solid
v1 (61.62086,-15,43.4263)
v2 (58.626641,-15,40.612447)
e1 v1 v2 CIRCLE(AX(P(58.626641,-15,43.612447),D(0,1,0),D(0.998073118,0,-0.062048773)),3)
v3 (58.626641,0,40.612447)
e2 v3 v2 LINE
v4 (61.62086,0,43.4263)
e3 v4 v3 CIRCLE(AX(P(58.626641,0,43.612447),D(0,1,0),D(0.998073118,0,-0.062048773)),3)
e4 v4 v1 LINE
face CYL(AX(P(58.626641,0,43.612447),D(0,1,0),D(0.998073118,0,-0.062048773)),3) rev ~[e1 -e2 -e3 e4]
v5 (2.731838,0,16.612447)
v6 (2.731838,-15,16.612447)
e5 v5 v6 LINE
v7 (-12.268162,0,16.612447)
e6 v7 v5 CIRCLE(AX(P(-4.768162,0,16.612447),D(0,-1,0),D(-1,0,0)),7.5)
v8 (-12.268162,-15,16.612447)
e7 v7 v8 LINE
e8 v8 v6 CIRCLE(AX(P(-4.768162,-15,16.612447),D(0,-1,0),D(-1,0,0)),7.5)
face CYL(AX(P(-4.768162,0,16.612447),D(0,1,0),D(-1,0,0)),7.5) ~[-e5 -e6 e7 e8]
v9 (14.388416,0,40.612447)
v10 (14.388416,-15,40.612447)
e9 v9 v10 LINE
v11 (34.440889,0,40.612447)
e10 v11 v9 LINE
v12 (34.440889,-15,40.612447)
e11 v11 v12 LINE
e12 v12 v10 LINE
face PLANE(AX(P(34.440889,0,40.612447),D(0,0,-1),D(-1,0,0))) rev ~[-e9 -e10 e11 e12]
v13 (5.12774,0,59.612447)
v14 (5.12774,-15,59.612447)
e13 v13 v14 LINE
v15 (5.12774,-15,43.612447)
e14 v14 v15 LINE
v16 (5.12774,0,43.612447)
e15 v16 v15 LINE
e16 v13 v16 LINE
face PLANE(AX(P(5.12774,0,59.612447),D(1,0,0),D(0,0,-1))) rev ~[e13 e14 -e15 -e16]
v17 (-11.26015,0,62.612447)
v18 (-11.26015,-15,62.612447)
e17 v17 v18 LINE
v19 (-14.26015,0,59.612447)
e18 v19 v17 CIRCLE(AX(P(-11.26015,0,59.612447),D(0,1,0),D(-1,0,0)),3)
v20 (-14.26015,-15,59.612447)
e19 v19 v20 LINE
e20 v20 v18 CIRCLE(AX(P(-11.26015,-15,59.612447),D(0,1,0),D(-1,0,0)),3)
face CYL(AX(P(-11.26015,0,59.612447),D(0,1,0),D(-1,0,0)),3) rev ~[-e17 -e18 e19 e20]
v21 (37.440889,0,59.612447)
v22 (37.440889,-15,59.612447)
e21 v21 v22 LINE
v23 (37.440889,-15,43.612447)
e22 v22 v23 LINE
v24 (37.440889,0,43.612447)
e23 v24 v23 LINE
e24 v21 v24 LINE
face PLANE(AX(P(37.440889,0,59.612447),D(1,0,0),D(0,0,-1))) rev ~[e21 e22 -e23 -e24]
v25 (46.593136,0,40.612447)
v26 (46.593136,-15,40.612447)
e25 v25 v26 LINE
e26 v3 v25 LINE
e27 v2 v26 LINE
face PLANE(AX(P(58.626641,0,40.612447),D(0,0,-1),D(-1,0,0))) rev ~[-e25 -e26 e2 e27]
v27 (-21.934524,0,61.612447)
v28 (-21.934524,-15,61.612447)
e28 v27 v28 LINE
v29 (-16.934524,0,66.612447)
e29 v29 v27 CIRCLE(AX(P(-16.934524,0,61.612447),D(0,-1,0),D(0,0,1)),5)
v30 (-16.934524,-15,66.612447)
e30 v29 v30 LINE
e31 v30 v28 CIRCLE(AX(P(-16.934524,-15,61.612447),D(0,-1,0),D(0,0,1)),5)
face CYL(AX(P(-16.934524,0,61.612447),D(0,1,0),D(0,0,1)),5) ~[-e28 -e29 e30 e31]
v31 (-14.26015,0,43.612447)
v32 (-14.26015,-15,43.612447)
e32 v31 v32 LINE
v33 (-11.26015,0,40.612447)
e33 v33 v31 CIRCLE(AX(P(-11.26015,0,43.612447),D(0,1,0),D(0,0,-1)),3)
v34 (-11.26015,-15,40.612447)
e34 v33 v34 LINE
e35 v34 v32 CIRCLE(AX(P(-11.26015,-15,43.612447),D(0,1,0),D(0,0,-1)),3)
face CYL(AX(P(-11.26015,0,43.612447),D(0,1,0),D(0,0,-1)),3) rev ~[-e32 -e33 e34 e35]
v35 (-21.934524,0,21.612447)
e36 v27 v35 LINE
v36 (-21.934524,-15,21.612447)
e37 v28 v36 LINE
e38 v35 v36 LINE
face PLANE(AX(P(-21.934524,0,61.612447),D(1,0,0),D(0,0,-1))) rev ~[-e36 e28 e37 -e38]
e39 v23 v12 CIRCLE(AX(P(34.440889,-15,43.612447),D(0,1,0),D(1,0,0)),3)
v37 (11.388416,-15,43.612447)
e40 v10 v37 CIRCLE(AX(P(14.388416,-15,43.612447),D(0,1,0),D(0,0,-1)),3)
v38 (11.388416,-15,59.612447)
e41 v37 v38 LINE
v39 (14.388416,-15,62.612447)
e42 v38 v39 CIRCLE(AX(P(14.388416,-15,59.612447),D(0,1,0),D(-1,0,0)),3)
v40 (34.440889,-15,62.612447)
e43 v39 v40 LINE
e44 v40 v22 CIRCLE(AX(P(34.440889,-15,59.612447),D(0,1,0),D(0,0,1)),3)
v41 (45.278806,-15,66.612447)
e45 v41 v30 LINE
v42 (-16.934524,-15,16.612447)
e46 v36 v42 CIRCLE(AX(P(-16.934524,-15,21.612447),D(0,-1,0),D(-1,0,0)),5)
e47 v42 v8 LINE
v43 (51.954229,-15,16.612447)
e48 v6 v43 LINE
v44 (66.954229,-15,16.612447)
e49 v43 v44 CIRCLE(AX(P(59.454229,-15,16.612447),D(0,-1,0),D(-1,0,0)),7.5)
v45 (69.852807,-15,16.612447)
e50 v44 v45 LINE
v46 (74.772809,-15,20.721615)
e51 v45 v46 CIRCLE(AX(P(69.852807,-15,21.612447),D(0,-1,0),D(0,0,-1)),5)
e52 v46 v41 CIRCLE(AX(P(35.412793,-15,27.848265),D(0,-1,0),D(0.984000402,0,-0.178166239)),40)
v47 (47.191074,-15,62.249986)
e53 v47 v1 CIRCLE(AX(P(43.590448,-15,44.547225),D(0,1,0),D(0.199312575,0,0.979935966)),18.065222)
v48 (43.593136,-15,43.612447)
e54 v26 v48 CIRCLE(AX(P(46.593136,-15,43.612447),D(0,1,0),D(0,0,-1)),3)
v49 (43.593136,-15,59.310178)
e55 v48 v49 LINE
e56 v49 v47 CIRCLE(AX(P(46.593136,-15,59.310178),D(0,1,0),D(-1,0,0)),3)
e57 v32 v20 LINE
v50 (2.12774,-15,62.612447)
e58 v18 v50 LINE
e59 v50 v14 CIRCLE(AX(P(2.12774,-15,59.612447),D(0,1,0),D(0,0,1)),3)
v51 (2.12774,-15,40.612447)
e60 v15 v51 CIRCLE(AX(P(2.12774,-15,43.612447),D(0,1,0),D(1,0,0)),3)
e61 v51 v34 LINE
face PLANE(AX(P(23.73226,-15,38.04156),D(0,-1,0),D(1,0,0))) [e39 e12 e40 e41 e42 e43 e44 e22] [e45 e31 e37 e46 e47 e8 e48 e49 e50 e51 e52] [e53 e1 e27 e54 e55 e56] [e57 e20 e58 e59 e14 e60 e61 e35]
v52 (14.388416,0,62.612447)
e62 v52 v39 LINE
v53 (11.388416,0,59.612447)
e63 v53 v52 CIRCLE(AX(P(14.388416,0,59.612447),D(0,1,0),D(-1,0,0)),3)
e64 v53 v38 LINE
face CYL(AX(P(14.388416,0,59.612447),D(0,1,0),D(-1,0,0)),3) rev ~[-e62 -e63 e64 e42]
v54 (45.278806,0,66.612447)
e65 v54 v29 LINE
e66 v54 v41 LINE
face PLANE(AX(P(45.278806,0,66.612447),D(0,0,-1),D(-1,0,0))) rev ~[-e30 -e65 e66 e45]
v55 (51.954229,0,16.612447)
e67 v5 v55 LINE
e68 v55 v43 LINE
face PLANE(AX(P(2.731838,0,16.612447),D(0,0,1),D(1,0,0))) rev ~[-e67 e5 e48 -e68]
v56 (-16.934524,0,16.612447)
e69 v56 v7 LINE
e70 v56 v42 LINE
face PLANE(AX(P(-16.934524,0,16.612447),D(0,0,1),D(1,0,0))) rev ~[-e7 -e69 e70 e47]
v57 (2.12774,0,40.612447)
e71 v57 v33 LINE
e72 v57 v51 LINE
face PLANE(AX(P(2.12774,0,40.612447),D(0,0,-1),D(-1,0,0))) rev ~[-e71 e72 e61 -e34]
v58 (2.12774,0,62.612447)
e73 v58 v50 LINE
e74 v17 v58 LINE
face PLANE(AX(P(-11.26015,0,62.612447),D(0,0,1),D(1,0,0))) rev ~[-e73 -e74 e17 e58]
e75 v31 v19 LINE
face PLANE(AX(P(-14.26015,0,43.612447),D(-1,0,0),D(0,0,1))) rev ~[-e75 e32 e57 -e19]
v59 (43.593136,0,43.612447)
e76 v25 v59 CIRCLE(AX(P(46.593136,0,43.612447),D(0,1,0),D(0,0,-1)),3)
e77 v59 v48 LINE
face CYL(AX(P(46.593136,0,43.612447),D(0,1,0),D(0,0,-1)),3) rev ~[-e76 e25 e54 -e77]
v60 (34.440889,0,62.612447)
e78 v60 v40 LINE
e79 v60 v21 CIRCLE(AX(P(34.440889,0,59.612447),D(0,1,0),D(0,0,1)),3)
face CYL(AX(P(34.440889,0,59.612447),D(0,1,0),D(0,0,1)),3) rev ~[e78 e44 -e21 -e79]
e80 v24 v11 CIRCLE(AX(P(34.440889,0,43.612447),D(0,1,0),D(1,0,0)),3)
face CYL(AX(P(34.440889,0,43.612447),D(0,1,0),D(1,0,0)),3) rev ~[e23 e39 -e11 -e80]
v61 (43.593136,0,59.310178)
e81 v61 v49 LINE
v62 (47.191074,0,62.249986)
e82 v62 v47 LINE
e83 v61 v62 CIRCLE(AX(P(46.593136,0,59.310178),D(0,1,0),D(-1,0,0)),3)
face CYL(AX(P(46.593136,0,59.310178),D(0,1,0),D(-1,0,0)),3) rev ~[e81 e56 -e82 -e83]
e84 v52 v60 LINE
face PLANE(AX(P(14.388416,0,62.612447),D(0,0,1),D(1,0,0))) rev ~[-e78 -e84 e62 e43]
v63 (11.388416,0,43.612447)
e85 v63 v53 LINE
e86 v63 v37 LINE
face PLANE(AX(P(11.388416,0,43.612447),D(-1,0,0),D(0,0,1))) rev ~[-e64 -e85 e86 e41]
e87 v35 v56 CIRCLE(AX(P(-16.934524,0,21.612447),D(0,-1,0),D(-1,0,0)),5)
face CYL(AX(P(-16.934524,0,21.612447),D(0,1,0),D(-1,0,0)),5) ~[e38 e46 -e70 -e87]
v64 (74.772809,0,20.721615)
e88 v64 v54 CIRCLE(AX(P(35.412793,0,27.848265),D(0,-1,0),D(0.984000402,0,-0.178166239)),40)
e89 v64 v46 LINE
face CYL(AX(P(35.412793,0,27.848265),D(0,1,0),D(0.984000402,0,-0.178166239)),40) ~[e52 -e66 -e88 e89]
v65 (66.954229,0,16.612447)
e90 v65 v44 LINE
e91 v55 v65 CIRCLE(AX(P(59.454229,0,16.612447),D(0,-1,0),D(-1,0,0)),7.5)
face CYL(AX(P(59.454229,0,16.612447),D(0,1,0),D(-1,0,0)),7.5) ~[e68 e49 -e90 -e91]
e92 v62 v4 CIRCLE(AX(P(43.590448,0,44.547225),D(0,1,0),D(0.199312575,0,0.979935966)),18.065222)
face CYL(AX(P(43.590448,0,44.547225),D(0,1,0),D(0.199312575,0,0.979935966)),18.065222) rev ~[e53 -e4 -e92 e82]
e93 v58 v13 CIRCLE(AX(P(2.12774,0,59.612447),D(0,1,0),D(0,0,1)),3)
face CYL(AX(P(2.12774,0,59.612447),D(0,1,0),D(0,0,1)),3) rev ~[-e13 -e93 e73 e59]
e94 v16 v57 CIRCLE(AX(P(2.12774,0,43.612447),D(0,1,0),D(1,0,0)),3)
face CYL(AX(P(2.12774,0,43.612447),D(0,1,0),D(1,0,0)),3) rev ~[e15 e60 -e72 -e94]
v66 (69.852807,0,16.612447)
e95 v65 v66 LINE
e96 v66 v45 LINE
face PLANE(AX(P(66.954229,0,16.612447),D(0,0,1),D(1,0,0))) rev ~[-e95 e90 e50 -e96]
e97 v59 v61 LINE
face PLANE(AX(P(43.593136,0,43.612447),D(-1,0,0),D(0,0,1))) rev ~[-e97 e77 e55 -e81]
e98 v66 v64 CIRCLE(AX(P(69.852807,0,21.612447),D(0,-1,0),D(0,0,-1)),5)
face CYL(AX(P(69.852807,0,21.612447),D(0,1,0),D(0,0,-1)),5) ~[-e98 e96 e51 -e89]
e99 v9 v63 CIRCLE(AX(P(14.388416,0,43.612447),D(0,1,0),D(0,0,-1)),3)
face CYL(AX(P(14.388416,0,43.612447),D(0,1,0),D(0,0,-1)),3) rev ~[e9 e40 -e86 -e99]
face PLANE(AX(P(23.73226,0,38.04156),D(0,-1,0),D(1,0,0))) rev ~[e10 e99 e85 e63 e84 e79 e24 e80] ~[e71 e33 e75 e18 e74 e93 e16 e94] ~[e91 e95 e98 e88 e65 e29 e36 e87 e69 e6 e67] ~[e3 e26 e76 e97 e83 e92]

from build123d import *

# Parameters (mm, degrees)
F1_DEPTH = 15


# Not quite as in the source:
# - a feature names something its author has since deleted; it is built from what else it names


with BuildPart() as f1:
    # F0 (on Front) → F1 (new body)
    with BuildSketch(Plane.XZ):
        with BuildLine():
            Line((45.2788062093, 66.612446636), (-16.9345241785, 66.612446636))
            ThreePointArc((-16.9345241785, 66.612446636), (-20.4700580844, 65.1479805419), (-21.9345241785, 61.612446636))
            Line((-21.9345241785, 61.612446636), (-21.9345241785, 21.612446636))
            ThreePointArc((-21.9345241785, 21.612446636), (-20.4700580844, 18.07691273), (-16.9345241785, 16.612446636))
            Line((-16.9345241785, 16.612446636), (-12.2681620345, 16.612446636))
            ThreePointArc((-12.2681620345, 16.612446636), (-4.7681620345, 9.112446636), (2.7318379655, 16.612446636))
            Line((2.7318379655, 16.612446636), (51.954228729, 16.612446636))
            ThreePointArc((51.954228729, 16.612446636), (59.454228729, 9.112446636), (66.954228729, 16.612446636))
            Line((66.954228729, 16.612446636), (69.8528067806, 16.612446636))
            ThreePointArc((69.8528067806, 16.612446636), (73.0579467169, 17.774859114), (74.7728087909, 20.7216154405))
            ThreePointArc((74.7728087909, 20.7216154405), (69.0623483383, 49.4748090163), (45.2788062093, 66.612446636))
        make_face()
        with BuildLine():
            ThreePointArc((-14.2601495609, 59.612446636), (-13.3814699044, 61.7337669795), (-11.2601495609, 62.612446636))
            Line((-11.2601495609, 62.612446636), (2.1277400926, 62.612446636))
            ThreePointArc((2.1277400926, 62.612446636), (4.2490604361, 61.7337669795), (5.1277400926, 59.612446636))
            Line((5.1277400926, 59.612446636), (5.1277400926, 43.612446636))
            ThreePointArc((5.1277400926, 43.612446636), (4.2490604361, 41.4911262924), (2.1277400926, 40.612446636))
            Line((2.1277400926, 40.612446636), (-11.2601495609, 40.612446636))
            ThreePointArc((-11.2601495609, 40.612446636), (-13.3814699044, 41.4911262924), (-14.2601495609, 43.612446636))
            Line((-14.2601495609, 43.612446636), (-14.2601495609, 59.612446636))
        make_face(mode=Mode.SUBTRACT)
        with BuildLine():
            ThreePointArc((11.388416402, 59.612446636), (12.2670960585, 61.7337669795), (14.388416402, 62.612446636))
            Line((14.388416402, 62.612446636), (34.4408885837, 62.612446636))
            ThreePointArc((34.4408885837, 62.612446636), (36.5622089272, 61.7337669795), (37.4408885837, 59.612446636))
            Line((37.4408885837, 59.612446636), (37.4408885837, 43.612446636))
            ThreePointArc((37.4408885837, 43.612446636), (36.5622089272, 41.4911262924), (34.4408885837, 40.612446636))
            Line((34.4408885837, 40.612446636), (14.388416402, 40.612446636))
            ThreePointArc((14.388416402, 40.612446636), (12.2670960585, 41.4911262924), (11.388416402, 43.612446636))
            Line((11.388416402, 43.612446636), (11.388416402, 59.612446636))
        make_face(mode=Mode.SUBTRACT)
        with BuildLine():
            ThreePointArc((61.6208599434, 43.4263003167), (60.6810944136, 41.4263040334), (58.626640588, 40.612446636))
            Line((58.626640588, 40.612446636), (46.5931359261, 40.612446636))
            ThreePointArc((46.5931359261, 40.612446636), (44.4718155826, 41.4911262924), (43.5931359261, 43.612446636))
            Line((43.5931359261, 43.612446636), (43.5931359261, 59.3101777172))
            ThreePointArc((43.5931359261, 59.3101777172), (44.6949543188, 61.6333020328), (47.1910736498, 62.2499856155))
            ThreePointArc((47.1910736498, 62.2499856155), (57.9277499616, 55.5378575882), (61.6208599434, 43.4263003167))
        make_face(mode=Mode.SUBTRACT)
    extrude(amount=F1_DEPTH)


solid = f1.part
